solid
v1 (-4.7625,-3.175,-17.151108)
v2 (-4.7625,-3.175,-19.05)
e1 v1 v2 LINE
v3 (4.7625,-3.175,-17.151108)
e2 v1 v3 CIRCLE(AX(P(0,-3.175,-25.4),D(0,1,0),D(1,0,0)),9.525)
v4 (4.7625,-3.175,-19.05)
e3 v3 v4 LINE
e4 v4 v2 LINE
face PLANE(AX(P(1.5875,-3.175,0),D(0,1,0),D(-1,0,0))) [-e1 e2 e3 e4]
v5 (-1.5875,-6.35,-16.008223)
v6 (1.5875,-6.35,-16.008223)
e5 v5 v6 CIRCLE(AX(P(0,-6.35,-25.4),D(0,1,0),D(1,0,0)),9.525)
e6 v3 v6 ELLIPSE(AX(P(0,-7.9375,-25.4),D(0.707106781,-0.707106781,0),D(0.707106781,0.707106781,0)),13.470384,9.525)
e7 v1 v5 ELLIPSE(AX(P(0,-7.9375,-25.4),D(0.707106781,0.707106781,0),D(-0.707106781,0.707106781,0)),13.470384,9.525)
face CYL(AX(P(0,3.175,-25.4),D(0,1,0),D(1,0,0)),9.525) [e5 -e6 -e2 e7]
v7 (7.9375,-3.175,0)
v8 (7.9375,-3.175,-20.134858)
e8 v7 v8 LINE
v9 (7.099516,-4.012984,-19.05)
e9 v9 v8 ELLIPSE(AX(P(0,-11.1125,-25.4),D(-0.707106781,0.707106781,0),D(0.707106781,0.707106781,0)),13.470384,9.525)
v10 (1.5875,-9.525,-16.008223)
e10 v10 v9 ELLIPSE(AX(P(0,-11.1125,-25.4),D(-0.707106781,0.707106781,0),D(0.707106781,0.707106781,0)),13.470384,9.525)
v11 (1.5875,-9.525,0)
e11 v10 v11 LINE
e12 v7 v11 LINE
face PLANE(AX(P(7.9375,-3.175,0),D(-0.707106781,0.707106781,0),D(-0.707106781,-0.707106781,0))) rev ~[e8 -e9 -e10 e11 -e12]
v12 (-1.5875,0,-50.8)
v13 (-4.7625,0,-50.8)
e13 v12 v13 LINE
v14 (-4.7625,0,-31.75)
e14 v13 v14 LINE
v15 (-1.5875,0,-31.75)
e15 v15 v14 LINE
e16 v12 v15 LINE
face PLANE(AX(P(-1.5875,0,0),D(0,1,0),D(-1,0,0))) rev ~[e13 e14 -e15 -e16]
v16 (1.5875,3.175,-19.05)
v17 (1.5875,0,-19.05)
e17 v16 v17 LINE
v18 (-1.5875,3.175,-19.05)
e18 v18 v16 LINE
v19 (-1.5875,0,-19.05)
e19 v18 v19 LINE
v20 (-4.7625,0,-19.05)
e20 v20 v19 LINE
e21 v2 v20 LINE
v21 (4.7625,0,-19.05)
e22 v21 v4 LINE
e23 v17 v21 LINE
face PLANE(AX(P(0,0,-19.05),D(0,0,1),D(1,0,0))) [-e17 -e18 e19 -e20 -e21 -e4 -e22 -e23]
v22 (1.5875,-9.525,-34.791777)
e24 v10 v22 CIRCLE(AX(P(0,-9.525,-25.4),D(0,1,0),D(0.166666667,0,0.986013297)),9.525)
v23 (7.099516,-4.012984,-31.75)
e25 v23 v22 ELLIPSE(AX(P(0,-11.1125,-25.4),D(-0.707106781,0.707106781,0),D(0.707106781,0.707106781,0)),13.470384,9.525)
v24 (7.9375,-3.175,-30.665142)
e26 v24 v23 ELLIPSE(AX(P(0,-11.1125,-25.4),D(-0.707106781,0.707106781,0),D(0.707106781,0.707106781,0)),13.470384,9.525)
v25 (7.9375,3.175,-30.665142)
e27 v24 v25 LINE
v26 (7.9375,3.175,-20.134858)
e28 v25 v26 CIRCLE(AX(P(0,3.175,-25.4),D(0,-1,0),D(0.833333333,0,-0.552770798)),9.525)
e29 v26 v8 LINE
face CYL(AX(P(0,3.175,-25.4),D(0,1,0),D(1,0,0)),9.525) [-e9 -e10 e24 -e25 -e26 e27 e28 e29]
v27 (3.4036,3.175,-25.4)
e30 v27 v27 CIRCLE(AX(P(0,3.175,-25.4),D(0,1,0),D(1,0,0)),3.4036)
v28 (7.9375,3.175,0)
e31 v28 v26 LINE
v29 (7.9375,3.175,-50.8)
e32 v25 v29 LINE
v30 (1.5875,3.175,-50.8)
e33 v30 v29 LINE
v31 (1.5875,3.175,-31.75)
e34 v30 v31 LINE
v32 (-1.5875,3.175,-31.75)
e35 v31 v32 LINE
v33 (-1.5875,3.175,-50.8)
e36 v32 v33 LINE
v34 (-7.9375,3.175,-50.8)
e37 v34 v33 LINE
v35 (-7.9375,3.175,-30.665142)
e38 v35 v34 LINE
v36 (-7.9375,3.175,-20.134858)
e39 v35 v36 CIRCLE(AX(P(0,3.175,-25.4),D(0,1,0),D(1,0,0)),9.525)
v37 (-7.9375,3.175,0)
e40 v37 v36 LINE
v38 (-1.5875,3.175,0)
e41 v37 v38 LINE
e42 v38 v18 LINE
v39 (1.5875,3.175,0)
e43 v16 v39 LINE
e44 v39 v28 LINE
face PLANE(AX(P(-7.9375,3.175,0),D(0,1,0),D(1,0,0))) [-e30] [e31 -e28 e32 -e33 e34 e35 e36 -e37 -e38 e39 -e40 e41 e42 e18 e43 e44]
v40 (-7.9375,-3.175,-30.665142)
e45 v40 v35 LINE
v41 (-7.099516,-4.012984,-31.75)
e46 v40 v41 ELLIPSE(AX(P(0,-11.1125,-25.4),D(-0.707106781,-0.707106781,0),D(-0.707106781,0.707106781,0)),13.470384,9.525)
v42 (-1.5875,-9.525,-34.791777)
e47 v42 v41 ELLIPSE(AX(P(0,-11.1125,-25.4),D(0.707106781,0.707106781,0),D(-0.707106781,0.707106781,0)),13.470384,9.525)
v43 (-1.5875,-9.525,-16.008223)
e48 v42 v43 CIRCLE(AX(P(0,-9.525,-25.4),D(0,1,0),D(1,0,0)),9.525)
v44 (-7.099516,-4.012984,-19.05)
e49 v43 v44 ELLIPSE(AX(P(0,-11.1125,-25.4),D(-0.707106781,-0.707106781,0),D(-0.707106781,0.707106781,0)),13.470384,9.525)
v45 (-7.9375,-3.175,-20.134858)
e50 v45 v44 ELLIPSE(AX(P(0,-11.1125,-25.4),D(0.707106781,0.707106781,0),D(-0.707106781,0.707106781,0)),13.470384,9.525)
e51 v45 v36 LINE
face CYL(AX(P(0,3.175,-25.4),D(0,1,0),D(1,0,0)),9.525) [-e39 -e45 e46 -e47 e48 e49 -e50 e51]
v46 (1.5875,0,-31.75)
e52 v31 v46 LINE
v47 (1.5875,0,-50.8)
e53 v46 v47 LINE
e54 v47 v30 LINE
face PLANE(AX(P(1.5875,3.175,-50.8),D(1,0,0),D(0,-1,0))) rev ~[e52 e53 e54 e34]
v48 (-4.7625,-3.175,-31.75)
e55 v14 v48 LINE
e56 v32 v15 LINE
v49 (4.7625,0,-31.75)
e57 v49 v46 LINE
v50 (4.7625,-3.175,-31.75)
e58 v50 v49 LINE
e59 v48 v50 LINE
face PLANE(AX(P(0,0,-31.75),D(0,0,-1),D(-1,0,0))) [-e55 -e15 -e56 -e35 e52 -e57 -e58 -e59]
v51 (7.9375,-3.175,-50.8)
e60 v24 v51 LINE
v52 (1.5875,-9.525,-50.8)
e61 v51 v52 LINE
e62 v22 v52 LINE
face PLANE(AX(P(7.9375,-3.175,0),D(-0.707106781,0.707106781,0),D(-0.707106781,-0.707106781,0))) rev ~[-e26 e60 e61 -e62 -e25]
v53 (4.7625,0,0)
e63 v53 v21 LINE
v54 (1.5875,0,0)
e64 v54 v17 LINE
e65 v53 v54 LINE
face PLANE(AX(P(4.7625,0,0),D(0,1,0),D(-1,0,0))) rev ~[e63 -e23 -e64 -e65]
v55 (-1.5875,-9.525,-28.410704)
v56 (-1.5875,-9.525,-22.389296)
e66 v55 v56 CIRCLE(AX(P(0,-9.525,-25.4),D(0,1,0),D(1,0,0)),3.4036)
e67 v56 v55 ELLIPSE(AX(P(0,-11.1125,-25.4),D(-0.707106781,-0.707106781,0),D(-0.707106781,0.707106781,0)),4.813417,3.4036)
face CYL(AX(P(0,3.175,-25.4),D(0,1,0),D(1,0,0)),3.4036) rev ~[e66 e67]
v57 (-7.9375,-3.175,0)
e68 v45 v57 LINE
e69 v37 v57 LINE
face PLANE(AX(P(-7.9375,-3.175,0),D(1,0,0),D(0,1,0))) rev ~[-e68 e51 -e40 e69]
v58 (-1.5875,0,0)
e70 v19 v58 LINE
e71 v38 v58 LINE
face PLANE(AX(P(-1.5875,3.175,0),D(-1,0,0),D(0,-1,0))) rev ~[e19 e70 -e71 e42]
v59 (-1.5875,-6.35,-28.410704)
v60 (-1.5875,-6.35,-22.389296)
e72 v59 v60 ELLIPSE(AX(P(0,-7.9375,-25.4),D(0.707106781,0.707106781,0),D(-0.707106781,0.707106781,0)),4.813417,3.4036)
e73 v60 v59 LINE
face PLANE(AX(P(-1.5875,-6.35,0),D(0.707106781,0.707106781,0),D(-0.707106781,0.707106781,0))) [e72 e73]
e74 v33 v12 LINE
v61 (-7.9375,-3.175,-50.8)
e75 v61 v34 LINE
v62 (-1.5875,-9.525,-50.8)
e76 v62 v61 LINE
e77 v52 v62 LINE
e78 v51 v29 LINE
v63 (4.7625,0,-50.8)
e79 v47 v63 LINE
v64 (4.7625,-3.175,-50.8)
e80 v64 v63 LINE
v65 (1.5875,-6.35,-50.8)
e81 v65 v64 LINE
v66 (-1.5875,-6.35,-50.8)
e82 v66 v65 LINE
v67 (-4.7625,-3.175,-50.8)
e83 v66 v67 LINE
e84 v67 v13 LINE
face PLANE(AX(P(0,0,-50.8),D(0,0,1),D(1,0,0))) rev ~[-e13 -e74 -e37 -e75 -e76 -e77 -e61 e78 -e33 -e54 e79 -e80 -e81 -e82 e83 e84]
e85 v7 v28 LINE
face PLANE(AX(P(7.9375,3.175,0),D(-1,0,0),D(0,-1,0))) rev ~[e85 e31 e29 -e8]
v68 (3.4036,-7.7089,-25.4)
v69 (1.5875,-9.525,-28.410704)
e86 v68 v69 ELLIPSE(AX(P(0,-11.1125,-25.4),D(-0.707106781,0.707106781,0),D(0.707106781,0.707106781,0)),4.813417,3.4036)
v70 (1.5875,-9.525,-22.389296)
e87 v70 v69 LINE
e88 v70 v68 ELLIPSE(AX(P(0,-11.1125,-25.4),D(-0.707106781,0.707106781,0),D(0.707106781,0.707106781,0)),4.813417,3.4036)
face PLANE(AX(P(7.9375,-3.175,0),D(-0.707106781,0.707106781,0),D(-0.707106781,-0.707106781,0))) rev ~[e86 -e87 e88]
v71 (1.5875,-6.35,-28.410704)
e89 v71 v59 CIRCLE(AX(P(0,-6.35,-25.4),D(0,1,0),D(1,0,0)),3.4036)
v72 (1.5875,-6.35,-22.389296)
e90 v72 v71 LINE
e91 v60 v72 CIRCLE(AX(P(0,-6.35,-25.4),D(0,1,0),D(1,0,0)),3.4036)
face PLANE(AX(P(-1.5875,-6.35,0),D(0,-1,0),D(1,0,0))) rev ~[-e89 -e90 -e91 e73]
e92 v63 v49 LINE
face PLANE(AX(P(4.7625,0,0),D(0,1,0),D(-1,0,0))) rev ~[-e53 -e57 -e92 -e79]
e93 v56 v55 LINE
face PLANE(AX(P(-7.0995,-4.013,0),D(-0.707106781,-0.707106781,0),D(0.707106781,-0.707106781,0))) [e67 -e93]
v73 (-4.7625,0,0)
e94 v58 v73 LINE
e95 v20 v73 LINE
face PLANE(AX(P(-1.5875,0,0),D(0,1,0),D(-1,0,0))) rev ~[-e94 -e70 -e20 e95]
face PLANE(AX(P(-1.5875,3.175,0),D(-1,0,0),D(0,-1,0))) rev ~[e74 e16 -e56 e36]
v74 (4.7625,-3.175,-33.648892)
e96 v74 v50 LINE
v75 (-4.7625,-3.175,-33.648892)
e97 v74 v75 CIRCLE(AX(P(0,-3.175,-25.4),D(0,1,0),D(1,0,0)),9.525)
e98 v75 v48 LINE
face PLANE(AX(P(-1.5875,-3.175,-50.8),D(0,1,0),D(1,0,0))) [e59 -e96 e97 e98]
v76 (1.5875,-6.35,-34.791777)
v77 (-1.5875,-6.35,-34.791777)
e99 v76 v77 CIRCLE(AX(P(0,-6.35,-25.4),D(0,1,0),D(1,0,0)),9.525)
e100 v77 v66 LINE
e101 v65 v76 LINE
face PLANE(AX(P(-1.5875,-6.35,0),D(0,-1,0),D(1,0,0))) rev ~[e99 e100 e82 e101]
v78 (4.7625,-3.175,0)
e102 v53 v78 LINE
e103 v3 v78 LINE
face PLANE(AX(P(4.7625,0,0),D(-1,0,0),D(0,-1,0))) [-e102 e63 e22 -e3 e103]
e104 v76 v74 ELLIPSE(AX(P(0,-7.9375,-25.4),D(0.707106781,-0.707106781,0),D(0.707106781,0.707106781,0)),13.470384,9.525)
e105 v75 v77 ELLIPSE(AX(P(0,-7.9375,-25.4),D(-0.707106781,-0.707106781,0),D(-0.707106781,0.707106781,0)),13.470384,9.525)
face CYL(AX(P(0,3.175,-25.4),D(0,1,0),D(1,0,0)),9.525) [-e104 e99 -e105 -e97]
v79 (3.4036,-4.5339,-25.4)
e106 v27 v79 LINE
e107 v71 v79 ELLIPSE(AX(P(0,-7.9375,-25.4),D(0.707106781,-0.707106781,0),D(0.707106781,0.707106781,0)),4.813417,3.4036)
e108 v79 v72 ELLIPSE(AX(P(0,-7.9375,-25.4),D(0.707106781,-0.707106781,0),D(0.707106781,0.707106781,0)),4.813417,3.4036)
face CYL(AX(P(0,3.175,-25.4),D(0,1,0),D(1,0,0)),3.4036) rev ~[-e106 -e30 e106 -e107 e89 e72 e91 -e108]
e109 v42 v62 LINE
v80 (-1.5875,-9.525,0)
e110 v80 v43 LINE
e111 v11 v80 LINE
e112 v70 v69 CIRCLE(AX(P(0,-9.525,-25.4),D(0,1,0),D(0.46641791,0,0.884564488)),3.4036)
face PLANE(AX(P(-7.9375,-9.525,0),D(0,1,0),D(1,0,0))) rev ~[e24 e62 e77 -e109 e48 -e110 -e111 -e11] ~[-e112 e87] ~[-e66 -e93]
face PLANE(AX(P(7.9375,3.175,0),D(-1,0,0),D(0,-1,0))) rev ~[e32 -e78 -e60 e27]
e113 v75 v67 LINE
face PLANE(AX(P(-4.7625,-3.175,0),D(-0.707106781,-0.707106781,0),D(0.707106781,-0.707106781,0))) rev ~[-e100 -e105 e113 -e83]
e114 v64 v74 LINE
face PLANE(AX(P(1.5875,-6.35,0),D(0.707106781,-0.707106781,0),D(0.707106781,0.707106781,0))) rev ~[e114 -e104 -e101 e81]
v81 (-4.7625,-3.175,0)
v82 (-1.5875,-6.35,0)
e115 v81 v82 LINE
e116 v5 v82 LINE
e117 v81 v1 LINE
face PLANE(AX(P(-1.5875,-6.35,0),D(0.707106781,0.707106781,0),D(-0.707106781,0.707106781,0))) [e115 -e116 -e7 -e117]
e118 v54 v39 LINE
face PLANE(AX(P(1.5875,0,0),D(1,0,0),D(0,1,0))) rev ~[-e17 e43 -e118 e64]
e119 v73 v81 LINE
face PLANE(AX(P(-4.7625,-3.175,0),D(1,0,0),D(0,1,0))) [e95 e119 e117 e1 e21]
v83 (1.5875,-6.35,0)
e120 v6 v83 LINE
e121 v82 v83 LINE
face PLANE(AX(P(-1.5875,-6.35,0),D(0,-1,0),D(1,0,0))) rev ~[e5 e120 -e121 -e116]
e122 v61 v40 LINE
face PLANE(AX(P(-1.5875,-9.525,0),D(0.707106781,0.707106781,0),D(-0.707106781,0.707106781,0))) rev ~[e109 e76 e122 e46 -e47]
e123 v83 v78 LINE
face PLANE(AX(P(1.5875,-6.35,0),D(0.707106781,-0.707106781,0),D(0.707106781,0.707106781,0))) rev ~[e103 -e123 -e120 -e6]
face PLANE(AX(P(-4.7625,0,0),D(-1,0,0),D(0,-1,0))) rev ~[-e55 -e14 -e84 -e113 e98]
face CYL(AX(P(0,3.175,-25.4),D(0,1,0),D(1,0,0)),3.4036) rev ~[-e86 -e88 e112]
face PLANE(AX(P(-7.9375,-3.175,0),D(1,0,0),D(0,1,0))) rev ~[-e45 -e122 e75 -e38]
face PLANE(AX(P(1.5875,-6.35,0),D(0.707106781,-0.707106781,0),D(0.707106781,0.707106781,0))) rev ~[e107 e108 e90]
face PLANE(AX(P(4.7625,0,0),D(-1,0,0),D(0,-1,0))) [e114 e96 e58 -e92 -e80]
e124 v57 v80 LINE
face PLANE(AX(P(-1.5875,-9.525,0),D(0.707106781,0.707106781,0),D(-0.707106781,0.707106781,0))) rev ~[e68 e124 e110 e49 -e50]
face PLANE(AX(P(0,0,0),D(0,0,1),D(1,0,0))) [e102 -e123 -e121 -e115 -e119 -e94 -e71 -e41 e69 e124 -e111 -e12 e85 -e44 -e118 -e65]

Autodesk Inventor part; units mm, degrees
ref_plane "YZ Plane" through (0, 0, 0) normal (1, 0, 0) x (0, 1, 0)
ref_plane "XZ Plane" through (0, 0, 0) normal (0, 1, 0) x (-1, 0, 0)
ref_plane "XY Plane" through (0, 0, 0) normal (0, 0, 1) x (1, 0, 0)
sketch "Sketch1" plane through (0, 0, 0) normal (0, 0, 1) x (1, 0, 0)
  line L0 (1.5875, 3.175) -> (7.9375, 3.175)
  line L1 (7.9375, 3.175) -> (7.9375, 0)
  line L2 (7.9375, 0) -> (1.5875, 0)
  line L3 (1.5875, 0) -> (1.5875, 3.175)
  line L4 (-7.9375, 3.175) -> (-1.5875, 3.175)
  line L5 (-1.5875, 3.175) -> (-1.5875, 0)
  line L6 (-1.5875, 0) -> (-7.9375, 0)
  line L7 (-7.9375, 0) -> (-7.9375, 3.175)
  line L8 (7.9375, 0) -> (4.7625, 0)
  line L9 (4.7625, 0) -> (4.7625, -3.175)
  line L10 (4.7625, -3.175) -> (7.9375, -3.175)
  line L11 (7.9375, -3.175) -> (7.9375, 0)
  line L12 (-7.9375, 0) -> (-4.7625, 0)
  line L13 (-4.7625, 0) -> (-4.7625, -3.175)
  line L14 (-4.7625, -3.175) -> (-7.9375, -3.175)
  line L15 (-7.9375, -3.175) -> (-7.9375, 0)
  line L16 (-4.7625, -3.175) -> (-1.5875, -6.35)
  line L17 (-1.5875, -6.35) -> (1.5875, -6.35)
  line L18 (1.5875, -6.35) -> (4.7625, -3.175)
  line L19 (7.9375, -3.175) -> (1.5875, -9.525)
  line L20 (1.5875, -9.525) -> (-1.5875, -9.525)
  line L21 (-1.5875, -9.525) -> (-7.9375, -3.175)
  line L22 (-7.9375, -3.175) -> (-4.7625, -3.175)
  point P0 (0, 0)
  dimension "d0" = 6.35
  dimension "d1" = 3.175
  dimension "d2" = 1.5875
  dimension "d3" = 3.175
  dimension "d4" = 6.35
  dimension "d5" = 3.175
  dimension "d6" = 3.175
  dimension "d7" = 4.7625
  dimension "d8" = 4.7625
  dimension "d9" = 3.175
  dimension "d10" = 3.175
  dimension "d11" = 135
  dimension "d12" = 3.175
extrude "Extrusion1" add sketch "Sketch1" against normal blind 50.8
sketch "Sketch2" plane through (7.9375, -3.175, 0) normal (1, 0, 0) x (0, 0, -1)
  line L0 (0, 3.175) -> (50.8, 3.175) projected
  line L1 (3.175, 3.175) -> (6.35, 3.175)
  line L2 (6.35, 3.175) -> (6.35, -6.35)
  line L3 (6.35, -6.35) -> (3.175, -6.35)
  line L4 (3.175, -6.35) -> (3.175, 3.175)
  line L5 (0, 0) -> (0, 6.35) projected
  line L6 (9.525, 3.175) -> (12.7, 3.175)
  line L7 (12.7, 3.175) -> (12.7, -6.35)
  line L8 (12.7, -6.35) -> (9.525, -6.35)
  line L9 (9.525, -6.35) -> (9.525, 3.175)
  line L10 (15.875, 3.175) -> (19.05, 3.175)
  line L11 (19.05, 3.175) -> (19.05, -6.35)
  line L12 (19.05, -6.35) -> (15.875, -6.35)
  line L13 (15.875, -6.35) -> (15.875, 3.175)
  line L14 (22.225, 3.175) -> (25.4, 3.175)
  line L15 (25.4, 3.175) -> (25.4, -6.35)
  line L16 (25.4, -6.35) -> (22.225, -6.35)
  line L17 (22.225, -6.35) -> (22.225, 3.175)
  line L18 (28.575, 3.175) -> (31.75, 3.175)
  line L19 (31.75, 3.175) -> (31.75, -6.35)
  line L20 (31.75, -6.35) -> (28.575, -6.35)
  line L21 (28.575, -6.35) -> (28.575, 3.175)
  line L22 (34.925, 3.175) -> (38.1, 3.175)
  line L23 (38.1, 3.175) -> (38.1, -6.35)
  line L24 (38.1, -6.35) -> (34.925, -6.35)
  line L25 (34.925, -6.35) -> (34.925, 3.175)
  line L26 (41.275, 3.175) -> (44.45, 3.175)
  line L27 (44.45, 3.175) -> (44.45, -6.35)
  line L28 (44.45, -6.35) -> (41.275, -6.35)
  line L29 (41.275, -6.35) -> (41.275, 3.175)
  line L30 (47.625, 3.175) -> (50.8, 3.175)
  line L31 (50.8, 3.175) -> (50.8, -6.35)
  line L32 (50.8, -6.35) -> (47.625, -6.35)
  line L33 (47.625, -6.35) -> (47.625, 3.175)
  dimension "d15" = 3.175
  dimension "d16" = 3.175
  dimension "d17" = 9.525
  dimension "d18" = 3.175
  dimension "d19" = 3.175
  dimension "d20" = 3.175
  dimension "d21" = 3.175
  dimension "d22" = 3.175
  dimension "d23" = 3.175
  dimension "d24" = 3.175
  dimension "d25" = 3.175
  dimension "d26" = 3.175
  dimension "d27" = 3.175
  dimension "d28" = 3.175
  dimension "d29" = 3.175
  dimension "d30" = 3.175
  dimension "d31" = 3.175
extrude "Extrusion2" cut sketch "Sketch2" against normal blind 6.35
sketch "Sketch3" plane through (-7.9375, -3.175, 0) normal (-1, 0, 0) x (0, 0, 1)
  line L0 (-3.175, 3.175) -> (-3.175, 3.175)
  line L1 (-50.8, 3.175) -> (-47.625, 3.175)
  line L2 (-47.625, 3.175) -> (-47.625, -6.35)
  line L3 (-47.625, -6.35) -> (-50.8, -6.35)
  line L4 (-50.8, -6.35) -> (-50.8, 3.175)
  line L5 (-44.45, 3.175) -> (-41.275, 3.175)
  line L6 (-41.275, 3.175) -> (-41.275, -6.35)
  line L7 (-41.275, -6.35) -> (-44.45, -6.35)
  line L8 (-44.45, -6.35) -> (-44.45, 3.175)
  line L9 (-38.1, 3.175) -> (-34.925, 3.175)
  line L10 (-34.925, 3.175) -> (-34.925, -6.35)
  line L11 (-34.925, -6.35) -> (-38.1, -6.35)
  line L12 (-38.1, -6.35) -> (-38.1, 3.175)
  line L13 (-31.75, 3.175) -> (-28.575, 3.175)
  line L14 (-28.575, 3.175) -> (-28.575, -6.35)
  line L15 (-28.575, -6.35) -> (-31.75, -6.35)
  line L16 (-31.75, -6.35) -> (-31.75, 3.175)
  line L17 (-25.4, 3.175) -> (-22.225, 3.175)
  line L18 (-22.225, 3.175) -> (-22.225, -6.35)
  line L19 (-22.225, -6.35) -> (-25.4, -6.35)
  line L20 (-25.4, -6.35) -> (-25.4, 3.175)
  line L21 (-19.05, 3.175) -> (-15.875, 3.175)
  line L22 (-15.875, 3.175) -> (-15.875, -6.35)
  line L23 (-15.875, -6.35) -> (-19.05, -6.35)
  line L24 (-19.05, -6.35) -> (-19.05, 3.175)
  line L25 (-12.7, 3.175) -> (-9.525, 3.175)
  line L26 (-9.525, 3.175) -> (-9.525, -6.35)
  line L27 (-9.525, -6.35) -> (-12.7, -6.35)
  line L28 (-12.7, -6.35) -> (-12.7, 3.175)
  line L29 (-6.35, -6.35) -> (-6.35, 3.175)
  line L30 (-6.35, 3.175) -> (-3.175, 3.175)
  line L31 (-3.175, 3.175) -> (-3.175, -6.35)
  line L32 (-3.175, -6.35) -> (-6.35, -6.35)
  point P0 (0, 3.175)
  point P1 (-3.175, 0)
  dimension "d34" = 3.175
  dimension "d35" = 9.525
  dimension "d36" = 3.175
  dimension "d37" = 3.175
  dimension "d38" = 3.175
  dimension "d39" = 3.175
  dimension "d40" = 3.175
  dimension "d41" = 3.175
  dimension "d42" = 3.175
  dimension "d43" = 3.175
  dimension "d44" = 3.175
  dimension "d45" = 3.175
  dimension "d46" = 3.175
  dimension "d47" = 3.175
  dimension "d48" = 3.175
  dimension "d49" = 3.175
extrude "Extrusion3" cut sketch "Sketch3" against normal blind 6.35
sketch "Sketch4" plane through (-7.9375, 3.175, 0) normal (0, 1, 0) x (1, 0, 0)
  circle A0 centre (7.9375, 25.4) radius 9.525
  point P0 (7.9375, 0)
  dimension "d52" = 19.05
extrude "Extrusion4" add sketch "Sketch4" against normal blind 12.7
sketch "Sketch5" plane through (-7.9375, 3.175, 0) normal (0, 1, 0) x (1, 0, 0)
  arc A0 (6.35, 34.7918) -> (6.35, 16.0082) centre (7.9375, 25.4) ccw projected
  circle A1 centre (7.9375, 25.4) radius 3.4036
  point P0 (7.9375, 0)
  dimension "d55" = 6.8072
extrude "Extrusion5" cut sketch "Sketch5" against normal blind 12.7
sketch "Sketch6" plane through (0, 0, 0) normal (0, 0, 1) x (1, 0, 0)
  line L0 (-1.5875, 3.175) -> (-1.5875, 0) projected
  line L1 (-1.5875, 3.175) -> (1.5875, 3.175)
  line L2 (1.5875, 3.175) -> (1.5875, -3.175)
  line L3 (1.5875, -3.175) -> (-1.5875, -3.175)
  line L4 (-1.5875, -3.175) -> (-1.5875, 3.175)
  line L5 (-4.7625, -3.175) -> (-4.7625, 0) projected
  line L6 (-4.7625, 0) -> (4.7625, 0)
  line L7 (4.7625, 0) -> (4.7625, -3.175)
  line L8 (4.7625, -3.175) -> (-4.7625, -3.175)
  line L9 (-4.7625, -3.175) -> (-4.7625, 0)
  point P0 (0, 0)
extrude "Extrusion6" cut sketch "Sketch6" against normal blind 19.05
sketch "Sketch7" plane through (0, 0, -50.8) normal (0, 0, -1) x (-1, 0, 0)
  line L0 (-1.5875, 3.175) -> (-1.5875, 0)
  line L1 (-1.5875, 3.175) -> (1.5875, 3.175)
  line L2 (1.5875, 3.175) -> (1.5875, -3.175)
  line L3 (1.5875, -3.175) -> (-1.5875, -3.175)
  line L4 (-1.5875, -3.175) -> (-1.5875, 3.175)
  line L5 (-4.7625, -3.175) -> (-4.7625, 0)
  line L6 (-4.7625, 0) -> (4.7625, 0)
  line L7 (4.7625, 0) -> (4.7625, -3.175)
  line L8 (4.7625, -3.175) -> (-4.7625, -3.175)
  line L9 (-4.7625, -3.175) -> (-4.7625, 0)
  point P0 (0, 0)
  point P1 (0, 0)
extrude "Extrusion7" cut sketch "Sketch7" against normal blind 19.05
sketch "Sketch9" plane through (0, 0, 0) normal (0, 0, 1) x (1, 0, 0)
  line L0 (4.7625, 0) -> (1.5875, 0) projected
  line L1 (4.7625, -3.175) -> (4.7625, 0) projected
  line L2 (4.7625, 0) -> (4.7625, -3.175)
  line L3 (1.5875, -6.35) -> (4.7625, -3.175) projected
  line L4 (4.7625, -3.175) -> (1.5875, -6.35)
  line L5 (-1.5875, -6.35) -> (1.5875, -6.35) projected
  line L6 (1.5875, -6.35) -> (-1.5875, -6.35)
  line L7 (-1.5875, -6.35) -> (-4.7625, -3.175) projected
  line L8 (-1.5875, -6.35) -> (-4.7625, -3.175)
  line L9 (-4.7625, -3.175) -> (-4.7625, 0)
  line L10 (-7.9375, 0) -> (-4.7625, 0) projected
  line L11 (-4.7625, 0) -> (-7.9375, 0)
  line L12 (-7.9375, 0) -> (-7.9375, -3.175)
  line L13 (-7.9375, -3.175) -> (-1.5875, -9.525)
  line L14 (-7.0995, -4.013) -> (-7.9375, -3.175) projected
  line L15 (-1.5875, -9.525) -> (1.5875, -9.525) projected
  line L16 (-1.5875, -9.525) -> (1.5875, -9.525)
  line L17 (7.9375, -3.175) -> (1.5875, -9.525) projected
  line L18 (1.5875, -9.525) -> (7.9375, -3.175)
  line L19 (7.9375, 0) -> (7.9375, -3.175) projected
  line L20 (7.9375, -3.175) -> (7.9375, 0)
  line L21 (7.9375, 0) -> (4.7625, 0)
  point P0 (0, 0)
extrude "Extrusion8" add sketch "Sketch9" against normal blind 50.8
sketch "Sketch12" plane through (7.9375, -3.175, 0) normal (1, 0, 0) x (0, 0, -1)
  line L0 (3.175, 3.175) -> (6.35, 3.175)
  line L1 (0, 3.175) -> (19.05, 3.175) projected
  line L2 (0, 0) -> (17.1511, 0) projected
  line L3 (6.35, 3.175) -> (3.175, 0)
  line L4 (3.175, 0) -> (3.175, 3.175)
  line L5 (0, 0) -> (0, 6.35) projected
  line L6 (9.525, 3.175) -> (3.175, -3.175)
  line L7 (3.175, -3.175) -> (6.35, -3.175)
  line L8 (6.35, -3.175) -> (12.7, 3.175)
  line L9 (0, 3.175) -> (19.05, 3.175) projected
  dimension "d67" = 3.175
properties part number "Basic_rail2"
